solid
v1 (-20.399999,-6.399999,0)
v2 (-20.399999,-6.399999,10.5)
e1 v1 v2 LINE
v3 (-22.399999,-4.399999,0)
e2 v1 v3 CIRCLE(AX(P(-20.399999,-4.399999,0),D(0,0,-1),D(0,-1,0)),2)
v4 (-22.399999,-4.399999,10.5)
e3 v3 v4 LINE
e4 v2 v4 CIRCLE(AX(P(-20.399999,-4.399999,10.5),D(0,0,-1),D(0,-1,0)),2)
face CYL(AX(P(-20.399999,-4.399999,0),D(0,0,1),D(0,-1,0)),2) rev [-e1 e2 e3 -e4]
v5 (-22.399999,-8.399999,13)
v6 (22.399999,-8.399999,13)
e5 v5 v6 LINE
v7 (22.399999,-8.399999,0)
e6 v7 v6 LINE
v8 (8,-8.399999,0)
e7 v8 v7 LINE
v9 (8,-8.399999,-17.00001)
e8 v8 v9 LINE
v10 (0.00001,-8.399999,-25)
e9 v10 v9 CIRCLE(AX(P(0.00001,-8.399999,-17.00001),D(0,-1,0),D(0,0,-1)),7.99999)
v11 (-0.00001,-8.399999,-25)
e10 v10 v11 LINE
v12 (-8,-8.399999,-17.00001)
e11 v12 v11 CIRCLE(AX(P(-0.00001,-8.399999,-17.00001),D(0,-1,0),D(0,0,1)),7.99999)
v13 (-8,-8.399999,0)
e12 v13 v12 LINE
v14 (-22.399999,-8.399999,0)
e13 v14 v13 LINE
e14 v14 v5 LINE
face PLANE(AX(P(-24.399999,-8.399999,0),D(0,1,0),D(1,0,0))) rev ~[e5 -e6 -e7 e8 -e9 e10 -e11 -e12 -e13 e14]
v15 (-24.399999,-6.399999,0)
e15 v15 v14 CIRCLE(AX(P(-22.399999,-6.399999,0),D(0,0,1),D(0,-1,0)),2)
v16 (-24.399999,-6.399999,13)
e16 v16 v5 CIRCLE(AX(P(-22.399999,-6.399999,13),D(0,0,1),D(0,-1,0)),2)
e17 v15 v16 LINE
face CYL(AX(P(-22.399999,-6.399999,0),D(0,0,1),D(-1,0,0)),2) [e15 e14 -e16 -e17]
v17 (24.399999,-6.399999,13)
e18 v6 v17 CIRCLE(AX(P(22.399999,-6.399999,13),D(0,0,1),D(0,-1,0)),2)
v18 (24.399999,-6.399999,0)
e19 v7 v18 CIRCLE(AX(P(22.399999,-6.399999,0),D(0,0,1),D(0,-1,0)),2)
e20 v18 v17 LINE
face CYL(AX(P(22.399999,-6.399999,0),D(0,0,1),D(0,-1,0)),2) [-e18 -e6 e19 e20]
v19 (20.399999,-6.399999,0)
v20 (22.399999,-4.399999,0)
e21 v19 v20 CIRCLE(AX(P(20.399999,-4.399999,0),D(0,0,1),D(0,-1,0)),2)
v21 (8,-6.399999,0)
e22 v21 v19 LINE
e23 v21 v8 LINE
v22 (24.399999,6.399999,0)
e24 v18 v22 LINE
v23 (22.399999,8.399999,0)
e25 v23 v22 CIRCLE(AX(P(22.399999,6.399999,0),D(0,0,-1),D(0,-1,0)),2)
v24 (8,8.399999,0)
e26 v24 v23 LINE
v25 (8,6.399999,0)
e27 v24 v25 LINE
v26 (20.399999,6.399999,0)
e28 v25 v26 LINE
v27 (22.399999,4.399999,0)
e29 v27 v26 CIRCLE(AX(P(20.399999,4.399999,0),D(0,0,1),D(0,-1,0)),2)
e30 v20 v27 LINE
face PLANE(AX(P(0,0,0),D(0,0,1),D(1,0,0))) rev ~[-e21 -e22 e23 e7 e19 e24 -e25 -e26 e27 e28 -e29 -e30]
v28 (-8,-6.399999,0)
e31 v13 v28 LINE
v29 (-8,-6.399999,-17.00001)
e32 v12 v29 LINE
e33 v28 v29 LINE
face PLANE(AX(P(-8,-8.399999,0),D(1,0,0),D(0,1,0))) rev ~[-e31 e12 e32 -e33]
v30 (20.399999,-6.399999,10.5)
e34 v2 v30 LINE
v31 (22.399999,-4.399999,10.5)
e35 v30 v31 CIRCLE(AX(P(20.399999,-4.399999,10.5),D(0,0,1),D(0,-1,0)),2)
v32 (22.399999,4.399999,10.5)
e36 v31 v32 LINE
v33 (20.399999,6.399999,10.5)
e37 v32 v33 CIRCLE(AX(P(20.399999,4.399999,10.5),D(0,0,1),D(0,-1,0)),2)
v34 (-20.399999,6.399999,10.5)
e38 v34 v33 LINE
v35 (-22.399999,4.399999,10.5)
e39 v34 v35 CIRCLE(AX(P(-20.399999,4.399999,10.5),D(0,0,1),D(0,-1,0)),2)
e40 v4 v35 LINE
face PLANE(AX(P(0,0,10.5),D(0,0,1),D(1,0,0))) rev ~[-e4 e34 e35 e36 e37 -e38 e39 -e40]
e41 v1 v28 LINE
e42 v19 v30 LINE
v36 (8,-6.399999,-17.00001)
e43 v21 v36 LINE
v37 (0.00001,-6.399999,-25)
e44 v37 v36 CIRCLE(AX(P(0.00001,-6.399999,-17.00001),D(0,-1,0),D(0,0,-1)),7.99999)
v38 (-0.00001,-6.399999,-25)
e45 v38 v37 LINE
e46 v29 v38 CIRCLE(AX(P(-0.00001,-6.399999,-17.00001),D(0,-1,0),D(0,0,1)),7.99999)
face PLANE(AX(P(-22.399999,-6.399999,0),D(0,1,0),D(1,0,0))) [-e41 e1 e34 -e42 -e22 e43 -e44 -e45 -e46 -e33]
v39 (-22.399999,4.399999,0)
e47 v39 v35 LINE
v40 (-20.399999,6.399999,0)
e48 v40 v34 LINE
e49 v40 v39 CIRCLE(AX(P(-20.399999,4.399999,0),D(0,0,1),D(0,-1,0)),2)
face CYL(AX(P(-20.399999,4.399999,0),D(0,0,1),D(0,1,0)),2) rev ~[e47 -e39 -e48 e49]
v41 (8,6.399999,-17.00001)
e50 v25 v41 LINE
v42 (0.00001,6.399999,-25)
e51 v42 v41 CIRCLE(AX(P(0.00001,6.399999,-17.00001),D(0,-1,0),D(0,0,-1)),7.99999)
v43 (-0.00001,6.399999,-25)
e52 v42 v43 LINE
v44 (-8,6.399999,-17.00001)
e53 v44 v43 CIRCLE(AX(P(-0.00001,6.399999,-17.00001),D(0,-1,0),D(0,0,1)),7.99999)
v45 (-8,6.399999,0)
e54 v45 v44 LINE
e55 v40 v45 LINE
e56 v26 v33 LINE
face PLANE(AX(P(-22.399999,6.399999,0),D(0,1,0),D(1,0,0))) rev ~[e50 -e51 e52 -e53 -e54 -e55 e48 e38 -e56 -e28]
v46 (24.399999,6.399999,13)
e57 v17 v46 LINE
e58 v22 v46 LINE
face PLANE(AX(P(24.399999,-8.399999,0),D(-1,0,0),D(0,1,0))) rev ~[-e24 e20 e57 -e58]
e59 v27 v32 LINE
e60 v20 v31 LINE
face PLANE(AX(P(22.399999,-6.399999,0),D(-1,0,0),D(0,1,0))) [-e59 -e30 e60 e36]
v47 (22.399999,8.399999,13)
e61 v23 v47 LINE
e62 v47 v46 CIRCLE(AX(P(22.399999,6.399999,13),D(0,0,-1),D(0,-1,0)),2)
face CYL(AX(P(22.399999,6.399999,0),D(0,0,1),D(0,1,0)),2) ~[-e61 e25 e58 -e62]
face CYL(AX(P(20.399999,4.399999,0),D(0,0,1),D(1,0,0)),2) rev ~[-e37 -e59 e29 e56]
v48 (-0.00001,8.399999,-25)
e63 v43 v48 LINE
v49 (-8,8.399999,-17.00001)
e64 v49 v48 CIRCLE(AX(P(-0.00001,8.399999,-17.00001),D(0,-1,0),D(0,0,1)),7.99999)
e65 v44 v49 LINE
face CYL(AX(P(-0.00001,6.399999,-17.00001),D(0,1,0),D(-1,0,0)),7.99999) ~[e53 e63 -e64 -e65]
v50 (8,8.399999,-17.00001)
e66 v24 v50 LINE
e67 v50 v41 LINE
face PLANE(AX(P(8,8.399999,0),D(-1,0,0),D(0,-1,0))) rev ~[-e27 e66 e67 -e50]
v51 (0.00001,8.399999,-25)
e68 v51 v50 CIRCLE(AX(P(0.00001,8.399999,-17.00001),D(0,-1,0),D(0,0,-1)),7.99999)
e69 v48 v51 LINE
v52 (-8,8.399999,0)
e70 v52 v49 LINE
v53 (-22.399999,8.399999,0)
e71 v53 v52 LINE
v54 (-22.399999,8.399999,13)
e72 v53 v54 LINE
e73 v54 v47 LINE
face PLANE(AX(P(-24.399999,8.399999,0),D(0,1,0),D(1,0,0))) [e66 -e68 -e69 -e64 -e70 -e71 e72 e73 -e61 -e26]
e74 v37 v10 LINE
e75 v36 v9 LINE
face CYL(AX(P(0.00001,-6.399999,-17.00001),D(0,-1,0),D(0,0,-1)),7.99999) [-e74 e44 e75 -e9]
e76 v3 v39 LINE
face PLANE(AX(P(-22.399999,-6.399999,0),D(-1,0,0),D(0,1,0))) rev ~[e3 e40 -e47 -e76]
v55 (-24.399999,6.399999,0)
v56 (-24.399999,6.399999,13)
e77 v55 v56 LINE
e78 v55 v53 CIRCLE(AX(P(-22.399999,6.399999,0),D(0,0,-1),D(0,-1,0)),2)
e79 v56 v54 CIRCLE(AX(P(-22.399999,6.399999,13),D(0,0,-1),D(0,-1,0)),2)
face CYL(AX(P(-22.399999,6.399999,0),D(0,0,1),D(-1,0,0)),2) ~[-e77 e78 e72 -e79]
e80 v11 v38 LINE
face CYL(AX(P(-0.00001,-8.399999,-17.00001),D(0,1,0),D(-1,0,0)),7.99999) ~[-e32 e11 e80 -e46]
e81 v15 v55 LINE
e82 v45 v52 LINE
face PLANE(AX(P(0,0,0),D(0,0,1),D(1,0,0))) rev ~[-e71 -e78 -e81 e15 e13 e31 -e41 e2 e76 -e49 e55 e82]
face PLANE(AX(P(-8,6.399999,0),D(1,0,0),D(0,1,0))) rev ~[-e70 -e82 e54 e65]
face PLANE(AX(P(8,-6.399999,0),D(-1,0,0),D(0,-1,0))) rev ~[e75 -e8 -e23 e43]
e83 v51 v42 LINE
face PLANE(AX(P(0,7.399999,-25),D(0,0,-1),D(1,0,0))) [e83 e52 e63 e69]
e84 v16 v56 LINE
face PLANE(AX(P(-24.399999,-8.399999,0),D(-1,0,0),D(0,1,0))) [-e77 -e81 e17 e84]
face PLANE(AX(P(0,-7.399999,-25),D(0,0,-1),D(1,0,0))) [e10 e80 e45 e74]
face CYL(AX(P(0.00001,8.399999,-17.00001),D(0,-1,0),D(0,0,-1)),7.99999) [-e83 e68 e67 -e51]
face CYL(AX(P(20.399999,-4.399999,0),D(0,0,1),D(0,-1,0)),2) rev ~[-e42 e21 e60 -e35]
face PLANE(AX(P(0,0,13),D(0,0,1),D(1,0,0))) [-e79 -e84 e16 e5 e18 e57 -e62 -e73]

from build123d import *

# Parameters (mm, degrees)
F0_W     = 48.799998641
F0_H     = 16.799998641
F0_W_2   = 44.799998641
F0_H_2   = 12.799998641
F0_W_3   = 44
F0_H_3   = 12
F0_W_4   = 40
F0_H_4   = 8
F1_DEPTH = 13
F2_DEPTH = 10.5
F3_R     = 2
F4_R     = 2
F6_DEPTH = 25
F7_R     = 7.99999


# Not quite as in the source:
# - a fillet or chamfer is up to 0.001 mm smaller than in the source, because OpenCascade refuses the exact size


with BuildPart() as f1:
    # F0 (on Top) → F1 (new body)
    with BuildSketch(Plane.XY):
        Rectangle(F0_W, F0_H)
        Rectangle(F0_W_2, F0_H_2, mode=Mode.SUBTRACT)
        Rectangle(F0_W_2, F0_H_2)
        Rectangle(F0_W_3, F0_H_3, mode=Mode.SUBTRACT)
        Rectangle(F0_W_3, F0_H_3)
        Rectangle(F0_W_4, F0_H_4, mode=Mode.SUBTRACT)
        Rectangle(F0_W_4, F0_H_4)
    extrude(amount=F1_DEPTH)

    # F0 (on Top) → F2 (cut)
    with BuildSketch(Plane.XY):
        Rectangle(F0_W_2, F0_H_2)
        Rectangle(F0_W_3, F0_H_3, mode=Mode.SUBTRACT)
        Rectangle(F0_W_3, F0_H_3)
        Rectangle(F0_W_4, F0_H_4, mode=Mode.SUBTRACT)
        Rectangle(F0_W_4, F0_H_4)
    extrude(amount=F2_DEPTH, mode=Mode.SUBTRACT)

    # F3
    f3_edges = [f1.edges().sort_by_distance(p)[0] for p in [
        (-24.399999, -8.399999, 6.5),
        (-24.399999, 8.399999, 6.5),
        (24.399999, -8.399999, 6.5),
        (24.399999, 8.399999, 6.5),
    ]]
    fillet(f3_edges, radius=F3_R)

    # F4
    f4_edges = [f1.edges().sort_by_distance(p)[0] for p in [
        (-22.399999, -6.399999, 5.25),
        (22.399999, -6.399999, 5.25),
        (22.399999, 6.399999, 5.25),
        (-22.399999, 6.399999, 5.25),
    ]]
    fillet(f4_edges, radius=F4_R)

    # F5 (on face) → F6 (join)
    with BuildSketch(Plane(origin=(0, 0, 0), x_dir=(1, 0, 0), z_dir=(0, 0, -1))):
        Polygon((-8, 6.3999993205), (0, 6.3999993205), (8, 6.3999993205), (8, 8.3999993205), (-8, 8.3999993205), align=None)
        Polygon((8, -8.3999993205), (8, -6.3999993205), (0, -6.3999993205), (-8, -6.3999993205), (-8, -8.3999993205), align=None)
    extrude(amount=F6_DEPTH)

    # F7 (radius 8 in the source; OpenCascade refuses exactly that, so slightly less here)
    f7_edges = [f1.edges().sort_by_distance(p)[0] for p in [
        (-8, -7.399999, -25),
        (8, -7.399999, -25),
        (-8, 7.399999, -25),
        (8, 7.399999, -25),
    ]]
    fillet(f7_edges, radius=F7_R)


solid = f1.part
